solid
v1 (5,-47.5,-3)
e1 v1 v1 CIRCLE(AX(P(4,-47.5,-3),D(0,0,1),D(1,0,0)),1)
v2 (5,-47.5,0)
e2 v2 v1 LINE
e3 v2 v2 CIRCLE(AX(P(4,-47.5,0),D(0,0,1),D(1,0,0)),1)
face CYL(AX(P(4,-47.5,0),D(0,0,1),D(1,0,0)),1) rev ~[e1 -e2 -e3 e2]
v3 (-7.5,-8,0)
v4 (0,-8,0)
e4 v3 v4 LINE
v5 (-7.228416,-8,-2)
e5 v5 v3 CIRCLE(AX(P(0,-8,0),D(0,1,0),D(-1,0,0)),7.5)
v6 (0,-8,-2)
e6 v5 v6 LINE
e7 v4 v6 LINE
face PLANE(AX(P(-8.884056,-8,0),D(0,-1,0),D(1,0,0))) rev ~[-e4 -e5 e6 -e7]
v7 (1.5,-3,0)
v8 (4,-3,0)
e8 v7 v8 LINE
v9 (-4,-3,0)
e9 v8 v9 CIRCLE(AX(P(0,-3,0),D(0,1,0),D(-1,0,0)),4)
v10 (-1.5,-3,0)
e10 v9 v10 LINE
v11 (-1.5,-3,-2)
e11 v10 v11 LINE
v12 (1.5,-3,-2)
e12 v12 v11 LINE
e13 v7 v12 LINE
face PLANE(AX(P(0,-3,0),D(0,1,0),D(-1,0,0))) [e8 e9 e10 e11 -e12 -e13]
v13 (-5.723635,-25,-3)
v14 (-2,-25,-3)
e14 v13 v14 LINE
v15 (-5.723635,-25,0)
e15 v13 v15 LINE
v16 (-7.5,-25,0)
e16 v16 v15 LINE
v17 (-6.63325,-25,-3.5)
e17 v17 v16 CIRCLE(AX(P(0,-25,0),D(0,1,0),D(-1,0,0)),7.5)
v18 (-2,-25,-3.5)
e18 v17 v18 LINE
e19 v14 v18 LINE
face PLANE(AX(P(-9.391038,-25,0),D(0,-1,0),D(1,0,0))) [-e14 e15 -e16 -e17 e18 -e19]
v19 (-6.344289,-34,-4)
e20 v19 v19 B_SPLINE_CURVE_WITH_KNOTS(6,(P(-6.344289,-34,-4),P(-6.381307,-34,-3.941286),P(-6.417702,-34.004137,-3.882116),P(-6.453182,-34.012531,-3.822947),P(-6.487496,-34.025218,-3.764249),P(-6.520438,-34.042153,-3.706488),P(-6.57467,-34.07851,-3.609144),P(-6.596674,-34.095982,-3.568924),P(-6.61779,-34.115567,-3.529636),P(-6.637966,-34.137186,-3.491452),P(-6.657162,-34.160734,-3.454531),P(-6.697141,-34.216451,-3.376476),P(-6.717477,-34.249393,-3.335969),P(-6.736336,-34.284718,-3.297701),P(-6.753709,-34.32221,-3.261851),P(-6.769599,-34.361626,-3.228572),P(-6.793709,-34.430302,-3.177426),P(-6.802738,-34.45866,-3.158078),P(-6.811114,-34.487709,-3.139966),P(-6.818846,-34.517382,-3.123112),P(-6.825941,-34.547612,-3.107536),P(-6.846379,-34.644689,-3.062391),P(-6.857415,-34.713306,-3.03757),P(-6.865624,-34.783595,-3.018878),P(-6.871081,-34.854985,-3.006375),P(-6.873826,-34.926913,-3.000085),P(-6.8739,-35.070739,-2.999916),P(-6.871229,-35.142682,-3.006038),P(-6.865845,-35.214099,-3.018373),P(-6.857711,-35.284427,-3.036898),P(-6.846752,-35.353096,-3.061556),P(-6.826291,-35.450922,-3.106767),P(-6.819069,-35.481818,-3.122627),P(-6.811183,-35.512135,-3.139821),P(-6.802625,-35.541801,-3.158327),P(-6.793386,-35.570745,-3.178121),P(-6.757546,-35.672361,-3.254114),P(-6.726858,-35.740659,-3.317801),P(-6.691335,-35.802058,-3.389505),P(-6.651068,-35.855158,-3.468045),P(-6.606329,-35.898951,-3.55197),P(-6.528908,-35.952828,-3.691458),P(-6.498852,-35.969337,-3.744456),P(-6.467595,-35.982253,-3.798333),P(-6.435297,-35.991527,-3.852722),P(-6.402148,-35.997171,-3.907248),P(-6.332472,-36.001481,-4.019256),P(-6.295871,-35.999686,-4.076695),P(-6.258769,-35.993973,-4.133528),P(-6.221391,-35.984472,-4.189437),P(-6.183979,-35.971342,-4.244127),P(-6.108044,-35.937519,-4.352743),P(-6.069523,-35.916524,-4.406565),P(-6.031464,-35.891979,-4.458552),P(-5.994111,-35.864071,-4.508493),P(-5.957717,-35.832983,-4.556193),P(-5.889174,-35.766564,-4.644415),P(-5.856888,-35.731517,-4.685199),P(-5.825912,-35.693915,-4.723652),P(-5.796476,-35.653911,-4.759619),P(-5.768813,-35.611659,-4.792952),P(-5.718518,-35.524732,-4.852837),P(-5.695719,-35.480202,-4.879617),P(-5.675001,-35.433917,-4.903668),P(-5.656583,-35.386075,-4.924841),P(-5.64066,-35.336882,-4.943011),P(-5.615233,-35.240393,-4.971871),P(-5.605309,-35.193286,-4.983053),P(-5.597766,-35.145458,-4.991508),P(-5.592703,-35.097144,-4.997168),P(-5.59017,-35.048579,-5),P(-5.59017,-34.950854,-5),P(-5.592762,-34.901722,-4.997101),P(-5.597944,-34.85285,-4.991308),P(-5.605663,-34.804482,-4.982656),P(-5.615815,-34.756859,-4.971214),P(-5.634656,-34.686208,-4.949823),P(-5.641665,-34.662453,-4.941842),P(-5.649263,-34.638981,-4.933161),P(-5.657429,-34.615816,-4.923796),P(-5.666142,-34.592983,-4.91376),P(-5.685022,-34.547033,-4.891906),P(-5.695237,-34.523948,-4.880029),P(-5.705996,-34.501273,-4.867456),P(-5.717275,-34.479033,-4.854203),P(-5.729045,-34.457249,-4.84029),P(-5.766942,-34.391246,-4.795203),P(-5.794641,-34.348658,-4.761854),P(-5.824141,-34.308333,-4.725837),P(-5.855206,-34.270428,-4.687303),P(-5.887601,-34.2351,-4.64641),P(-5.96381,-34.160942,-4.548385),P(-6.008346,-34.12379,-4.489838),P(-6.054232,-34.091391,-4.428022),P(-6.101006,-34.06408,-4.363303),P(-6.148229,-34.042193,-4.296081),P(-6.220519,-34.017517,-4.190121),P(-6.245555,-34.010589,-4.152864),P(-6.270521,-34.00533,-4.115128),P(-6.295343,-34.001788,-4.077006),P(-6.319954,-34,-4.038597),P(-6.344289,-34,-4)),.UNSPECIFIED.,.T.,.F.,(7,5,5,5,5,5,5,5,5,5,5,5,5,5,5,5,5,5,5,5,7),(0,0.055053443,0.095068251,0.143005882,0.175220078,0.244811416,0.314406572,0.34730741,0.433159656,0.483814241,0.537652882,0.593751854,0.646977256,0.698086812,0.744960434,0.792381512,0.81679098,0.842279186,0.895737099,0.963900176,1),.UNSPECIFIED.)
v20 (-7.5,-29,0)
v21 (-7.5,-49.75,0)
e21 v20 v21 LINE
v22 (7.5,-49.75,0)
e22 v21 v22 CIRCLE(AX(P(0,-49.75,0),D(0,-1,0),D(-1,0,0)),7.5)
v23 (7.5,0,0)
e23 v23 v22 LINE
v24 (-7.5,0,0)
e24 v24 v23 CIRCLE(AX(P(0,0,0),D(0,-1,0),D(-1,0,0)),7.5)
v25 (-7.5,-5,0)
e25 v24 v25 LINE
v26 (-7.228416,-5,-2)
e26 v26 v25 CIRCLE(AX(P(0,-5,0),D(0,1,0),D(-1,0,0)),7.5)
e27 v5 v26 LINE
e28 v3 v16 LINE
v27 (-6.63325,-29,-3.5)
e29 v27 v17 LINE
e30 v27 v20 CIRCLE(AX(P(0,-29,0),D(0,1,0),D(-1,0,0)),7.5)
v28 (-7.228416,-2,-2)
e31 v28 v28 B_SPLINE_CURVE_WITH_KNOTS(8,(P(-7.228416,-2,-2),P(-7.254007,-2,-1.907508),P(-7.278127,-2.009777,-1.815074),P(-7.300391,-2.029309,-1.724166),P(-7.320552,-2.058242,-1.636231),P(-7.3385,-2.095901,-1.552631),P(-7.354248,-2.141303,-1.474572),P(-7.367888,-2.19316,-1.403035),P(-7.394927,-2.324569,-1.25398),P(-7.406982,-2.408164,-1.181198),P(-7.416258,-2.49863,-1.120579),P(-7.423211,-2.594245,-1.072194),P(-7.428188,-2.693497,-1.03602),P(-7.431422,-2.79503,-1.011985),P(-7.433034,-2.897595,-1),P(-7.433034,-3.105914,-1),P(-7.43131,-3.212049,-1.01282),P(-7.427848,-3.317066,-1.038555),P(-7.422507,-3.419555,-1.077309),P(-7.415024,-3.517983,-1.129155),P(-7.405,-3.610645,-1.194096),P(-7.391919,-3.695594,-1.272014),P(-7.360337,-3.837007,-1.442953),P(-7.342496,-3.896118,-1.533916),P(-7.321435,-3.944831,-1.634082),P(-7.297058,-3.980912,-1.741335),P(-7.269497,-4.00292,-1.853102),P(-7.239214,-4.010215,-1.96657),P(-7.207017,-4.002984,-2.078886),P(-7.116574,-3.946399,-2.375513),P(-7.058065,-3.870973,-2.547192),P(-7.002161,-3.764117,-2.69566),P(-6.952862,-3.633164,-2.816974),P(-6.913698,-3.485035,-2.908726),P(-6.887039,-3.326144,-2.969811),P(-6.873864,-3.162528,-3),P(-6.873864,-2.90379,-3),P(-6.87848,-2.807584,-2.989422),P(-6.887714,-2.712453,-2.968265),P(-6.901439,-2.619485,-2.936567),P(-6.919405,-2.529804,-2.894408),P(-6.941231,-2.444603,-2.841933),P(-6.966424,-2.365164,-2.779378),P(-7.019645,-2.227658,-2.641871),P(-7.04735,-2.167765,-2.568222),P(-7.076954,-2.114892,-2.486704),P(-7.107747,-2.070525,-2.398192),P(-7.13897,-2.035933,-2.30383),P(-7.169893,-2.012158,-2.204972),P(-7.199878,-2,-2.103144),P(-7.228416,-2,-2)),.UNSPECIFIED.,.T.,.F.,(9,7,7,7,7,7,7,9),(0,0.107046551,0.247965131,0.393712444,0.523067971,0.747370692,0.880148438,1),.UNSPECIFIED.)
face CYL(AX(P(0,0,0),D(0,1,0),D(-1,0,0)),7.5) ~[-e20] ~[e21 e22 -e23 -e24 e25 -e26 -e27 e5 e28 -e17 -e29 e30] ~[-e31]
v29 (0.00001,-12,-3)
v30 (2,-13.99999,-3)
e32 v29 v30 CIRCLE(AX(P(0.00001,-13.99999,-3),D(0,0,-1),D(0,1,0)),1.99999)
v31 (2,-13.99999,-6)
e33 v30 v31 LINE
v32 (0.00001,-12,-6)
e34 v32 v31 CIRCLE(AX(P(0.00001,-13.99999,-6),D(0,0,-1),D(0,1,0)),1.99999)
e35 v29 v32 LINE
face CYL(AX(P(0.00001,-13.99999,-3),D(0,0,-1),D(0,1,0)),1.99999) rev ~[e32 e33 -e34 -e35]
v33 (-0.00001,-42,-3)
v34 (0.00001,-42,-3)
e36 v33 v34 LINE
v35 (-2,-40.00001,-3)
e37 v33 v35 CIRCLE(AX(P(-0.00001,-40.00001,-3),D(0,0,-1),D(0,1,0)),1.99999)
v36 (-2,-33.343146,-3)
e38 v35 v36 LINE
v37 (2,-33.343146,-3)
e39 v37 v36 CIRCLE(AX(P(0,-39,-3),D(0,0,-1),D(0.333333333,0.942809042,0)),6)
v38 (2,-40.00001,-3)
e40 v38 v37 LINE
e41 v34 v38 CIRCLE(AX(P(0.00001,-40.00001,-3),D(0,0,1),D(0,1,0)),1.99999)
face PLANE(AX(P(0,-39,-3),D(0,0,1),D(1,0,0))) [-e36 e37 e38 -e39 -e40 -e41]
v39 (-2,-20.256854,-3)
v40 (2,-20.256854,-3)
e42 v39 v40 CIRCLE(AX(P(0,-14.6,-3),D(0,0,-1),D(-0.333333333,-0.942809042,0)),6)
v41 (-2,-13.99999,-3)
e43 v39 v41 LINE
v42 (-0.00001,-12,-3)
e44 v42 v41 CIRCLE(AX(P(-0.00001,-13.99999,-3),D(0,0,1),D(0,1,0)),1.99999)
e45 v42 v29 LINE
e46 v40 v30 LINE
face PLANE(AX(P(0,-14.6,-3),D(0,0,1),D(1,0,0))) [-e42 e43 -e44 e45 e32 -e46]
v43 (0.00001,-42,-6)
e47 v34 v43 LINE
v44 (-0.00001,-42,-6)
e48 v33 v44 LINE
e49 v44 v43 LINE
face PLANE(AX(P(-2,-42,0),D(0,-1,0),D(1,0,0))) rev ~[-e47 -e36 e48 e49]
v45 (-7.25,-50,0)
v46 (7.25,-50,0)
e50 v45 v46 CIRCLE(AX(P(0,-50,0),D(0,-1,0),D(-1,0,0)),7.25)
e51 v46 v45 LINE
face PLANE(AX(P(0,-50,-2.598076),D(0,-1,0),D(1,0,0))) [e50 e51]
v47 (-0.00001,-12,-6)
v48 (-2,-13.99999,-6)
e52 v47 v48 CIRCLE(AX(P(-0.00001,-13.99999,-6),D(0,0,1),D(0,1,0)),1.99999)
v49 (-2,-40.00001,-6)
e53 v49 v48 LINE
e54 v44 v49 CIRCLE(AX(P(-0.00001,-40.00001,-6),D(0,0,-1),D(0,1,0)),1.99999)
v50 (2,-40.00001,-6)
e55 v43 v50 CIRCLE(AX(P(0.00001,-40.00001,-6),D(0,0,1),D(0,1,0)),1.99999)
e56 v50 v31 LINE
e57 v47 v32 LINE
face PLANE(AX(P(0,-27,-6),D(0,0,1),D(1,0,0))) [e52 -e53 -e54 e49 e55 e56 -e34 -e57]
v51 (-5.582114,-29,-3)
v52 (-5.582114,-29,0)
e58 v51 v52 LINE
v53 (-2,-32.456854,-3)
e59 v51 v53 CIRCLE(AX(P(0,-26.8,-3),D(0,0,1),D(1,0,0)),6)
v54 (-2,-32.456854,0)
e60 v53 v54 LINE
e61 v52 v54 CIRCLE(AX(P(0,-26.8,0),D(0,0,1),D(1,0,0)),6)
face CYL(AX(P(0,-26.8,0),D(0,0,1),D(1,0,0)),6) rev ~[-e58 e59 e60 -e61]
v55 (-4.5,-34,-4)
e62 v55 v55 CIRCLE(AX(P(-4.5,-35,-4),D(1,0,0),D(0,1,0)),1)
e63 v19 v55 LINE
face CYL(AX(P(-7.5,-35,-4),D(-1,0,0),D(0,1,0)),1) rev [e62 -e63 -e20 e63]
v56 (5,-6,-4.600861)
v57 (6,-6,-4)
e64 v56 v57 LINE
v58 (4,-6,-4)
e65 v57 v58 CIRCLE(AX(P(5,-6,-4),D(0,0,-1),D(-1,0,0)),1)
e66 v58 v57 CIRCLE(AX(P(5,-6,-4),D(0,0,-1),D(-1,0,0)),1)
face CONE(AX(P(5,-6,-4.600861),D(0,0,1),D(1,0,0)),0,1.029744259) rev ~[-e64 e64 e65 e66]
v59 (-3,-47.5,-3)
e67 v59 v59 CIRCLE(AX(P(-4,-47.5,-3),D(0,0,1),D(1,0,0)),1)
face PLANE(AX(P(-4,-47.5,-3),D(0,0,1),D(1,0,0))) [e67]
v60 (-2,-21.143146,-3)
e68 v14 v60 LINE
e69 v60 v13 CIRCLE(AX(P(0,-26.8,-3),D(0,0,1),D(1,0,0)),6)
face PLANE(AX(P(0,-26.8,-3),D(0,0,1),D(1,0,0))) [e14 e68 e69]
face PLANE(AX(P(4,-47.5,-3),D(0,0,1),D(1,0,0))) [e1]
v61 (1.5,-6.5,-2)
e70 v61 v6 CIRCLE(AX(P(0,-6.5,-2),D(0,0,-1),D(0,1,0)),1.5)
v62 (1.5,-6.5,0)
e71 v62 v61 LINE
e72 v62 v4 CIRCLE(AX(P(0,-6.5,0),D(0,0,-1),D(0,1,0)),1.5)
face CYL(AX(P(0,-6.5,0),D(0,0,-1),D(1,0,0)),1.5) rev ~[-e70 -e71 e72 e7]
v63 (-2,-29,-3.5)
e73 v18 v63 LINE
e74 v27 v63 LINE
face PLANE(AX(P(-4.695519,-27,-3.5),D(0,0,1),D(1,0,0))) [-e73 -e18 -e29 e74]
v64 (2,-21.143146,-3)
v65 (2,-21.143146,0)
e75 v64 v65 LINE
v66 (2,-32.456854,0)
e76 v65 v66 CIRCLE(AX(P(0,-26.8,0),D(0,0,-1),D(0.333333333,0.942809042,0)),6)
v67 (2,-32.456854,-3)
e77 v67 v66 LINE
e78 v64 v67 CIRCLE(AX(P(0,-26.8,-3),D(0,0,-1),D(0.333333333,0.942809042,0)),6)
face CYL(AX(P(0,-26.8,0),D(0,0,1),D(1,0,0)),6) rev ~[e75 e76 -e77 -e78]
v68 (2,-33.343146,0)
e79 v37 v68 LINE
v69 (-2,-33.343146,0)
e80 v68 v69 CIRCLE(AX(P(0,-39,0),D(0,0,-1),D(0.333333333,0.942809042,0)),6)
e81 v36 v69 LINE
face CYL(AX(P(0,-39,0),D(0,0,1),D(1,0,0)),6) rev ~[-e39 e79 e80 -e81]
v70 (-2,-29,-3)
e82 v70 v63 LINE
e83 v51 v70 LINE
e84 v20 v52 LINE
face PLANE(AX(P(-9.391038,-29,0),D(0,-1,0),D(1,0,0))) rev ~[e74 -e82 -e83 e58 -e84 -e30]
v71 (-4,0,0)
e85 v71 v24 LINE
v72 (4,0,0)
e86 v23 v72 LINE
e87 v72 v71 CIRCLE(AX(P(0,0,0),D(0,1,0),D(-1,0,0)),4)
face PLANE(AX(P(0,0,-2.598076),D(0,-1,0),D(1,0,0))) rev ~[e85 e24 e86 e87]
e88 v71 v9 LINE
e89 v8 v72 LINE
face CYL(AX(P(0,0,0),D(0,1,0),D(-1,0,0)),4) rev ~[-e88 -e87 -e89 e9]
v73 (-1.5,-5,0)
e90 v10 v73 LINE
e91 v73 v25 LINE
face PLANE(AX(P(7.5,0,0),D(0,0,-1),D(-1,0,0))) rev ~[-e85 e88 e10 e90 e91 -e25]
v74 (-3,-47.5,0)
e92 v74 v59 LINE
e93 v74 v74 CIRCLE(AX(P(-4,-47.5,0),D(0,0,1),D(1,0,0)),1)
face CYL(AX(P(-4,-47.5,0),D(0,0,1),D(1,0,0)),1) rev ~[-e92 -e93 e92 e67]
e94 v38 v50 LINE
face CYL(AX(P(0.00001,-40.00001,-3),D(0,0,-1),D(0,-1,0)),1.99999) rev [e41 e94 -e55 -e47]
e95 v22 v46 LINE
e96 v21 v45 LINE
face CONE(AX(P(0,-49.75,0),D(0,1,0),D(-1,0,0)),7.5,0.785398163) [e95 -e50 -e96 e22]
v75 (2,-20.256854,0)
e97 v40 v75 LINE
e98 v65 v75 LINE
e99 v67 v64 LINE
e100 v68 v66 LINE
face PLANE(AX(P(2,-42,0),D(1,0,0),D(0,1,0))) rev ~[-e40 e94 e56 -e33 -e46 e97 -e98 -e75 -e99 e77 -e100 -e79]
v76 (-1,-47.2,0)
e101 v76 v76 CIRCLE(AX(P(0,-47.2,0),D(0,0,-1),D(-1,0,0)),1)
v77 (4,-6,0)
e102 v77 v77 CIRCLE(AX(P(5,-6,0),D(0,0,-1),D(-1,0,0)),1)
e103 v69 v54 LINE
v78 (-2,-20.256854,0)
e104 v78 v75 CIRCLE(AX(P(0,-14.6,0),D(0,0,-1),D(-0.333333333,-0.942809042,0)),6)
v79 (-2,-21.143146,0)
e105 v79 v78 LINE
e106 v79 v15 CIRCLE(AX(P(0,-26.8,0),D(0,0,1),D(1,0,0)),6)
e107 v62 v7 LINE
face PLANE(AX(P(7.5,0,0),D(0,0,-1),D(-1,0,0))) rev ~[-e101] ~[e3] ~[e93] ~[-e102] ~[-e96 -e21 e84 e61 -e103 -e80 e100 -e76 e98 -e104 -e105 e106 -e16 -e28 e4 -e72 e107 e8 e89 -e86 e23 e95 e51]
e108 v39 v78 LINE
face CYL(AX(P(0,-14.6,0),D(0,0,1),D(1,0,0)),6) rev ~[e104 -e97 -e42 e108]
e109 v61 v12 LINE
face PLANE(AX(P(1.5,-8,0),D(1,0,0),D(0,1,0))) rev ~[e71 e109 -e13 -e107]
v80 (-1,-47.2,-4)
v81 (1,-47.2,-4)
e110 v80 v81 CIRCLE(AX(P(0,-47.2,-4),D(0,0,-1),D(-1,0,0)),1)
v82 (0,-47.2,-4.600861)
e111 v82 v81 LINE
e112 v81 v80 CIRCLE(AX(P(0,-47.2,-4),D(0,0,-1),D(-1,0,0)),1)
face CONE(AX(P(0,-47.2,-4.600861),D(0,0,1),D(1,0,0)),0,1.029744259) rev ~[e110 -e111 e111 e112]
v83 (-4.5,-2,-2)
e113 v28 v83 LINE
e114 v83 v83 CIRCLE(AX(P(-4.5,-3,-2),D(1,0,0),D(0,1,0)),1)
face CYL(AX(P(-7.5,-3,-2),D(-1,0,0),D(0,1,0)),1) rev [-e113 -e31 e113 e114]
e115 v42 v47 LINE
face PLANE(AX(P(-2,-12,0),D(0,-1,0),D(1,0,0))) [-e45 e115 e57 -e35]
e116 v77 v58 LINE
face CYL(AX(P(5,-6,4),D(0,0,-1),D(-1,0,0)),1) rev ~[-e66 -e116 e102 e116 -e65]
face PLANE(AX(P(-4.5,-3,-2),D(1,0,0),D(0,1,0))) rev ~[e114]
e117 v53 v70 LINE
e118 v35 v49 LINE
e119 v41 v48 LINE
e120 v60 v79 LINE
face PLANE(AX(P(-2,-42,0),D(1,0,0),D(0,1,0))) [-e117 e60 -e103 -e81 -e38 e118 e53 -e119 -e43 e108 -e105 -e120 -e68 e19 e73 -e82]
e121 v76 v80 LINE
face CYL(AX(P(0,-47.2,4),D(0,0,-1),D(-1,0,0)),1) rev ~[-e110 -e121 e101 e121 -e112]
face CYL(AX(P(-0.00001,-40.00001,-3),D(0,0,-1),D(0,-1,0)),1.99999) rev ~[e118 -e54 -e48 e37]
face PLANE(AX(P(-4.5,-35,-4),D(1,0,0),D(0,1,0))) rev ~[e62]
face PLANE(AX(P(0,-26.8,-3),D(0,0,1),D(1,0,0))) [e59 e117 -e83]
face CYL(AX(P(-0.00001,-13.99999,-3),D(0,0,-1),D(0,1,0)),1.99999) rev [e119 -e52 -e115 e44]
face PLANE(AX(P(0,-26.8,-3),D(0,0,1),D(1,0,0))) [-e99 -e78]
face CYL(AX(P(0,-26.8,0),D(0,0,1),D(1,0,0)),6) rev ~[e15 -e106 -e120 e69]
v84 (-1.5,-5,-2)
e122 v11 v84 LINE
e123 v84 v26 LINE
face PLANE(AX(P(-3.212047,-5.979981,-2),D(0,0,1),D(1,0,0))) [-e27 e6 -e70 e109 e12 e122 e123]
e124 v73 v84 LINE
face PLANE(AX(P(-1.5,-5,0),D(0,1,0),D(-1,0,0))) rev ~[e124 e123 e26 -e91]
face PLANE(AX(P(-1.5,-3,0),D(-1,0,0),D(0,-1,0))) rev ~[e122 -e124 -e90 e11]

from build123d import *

# Parameters (mm, degrees)
F1_DEPTH  = 50
F2_R      = 6
F3_DEPTH  = 3
F4_R      = 4
F5_DEPTH  = 3
F6_W      = 4
F6_H      = 30
F7_DEPTH  = 6
F8_R      = 1.99999
F9_W      = 9.3910377485
F9_H      = 4
F10_DEPTH = 3.5
F12_D     = 2
F12_DEPTH = 4
F12_TIP   = 0.600860619
F14_DEPTH = 2
F15_R     = 1.5
F16_SIZE  = 0.25
F18_R     = 1
F19_DEPTH = 3
F20_R     = 1
F21_DEPTH = 3


# Not quite as in the source:
# - a fillet or chamfer is up to 0.001 mm smaller than in the source, because OpenCascade refuses the exact size


with BuildPart() as f1:
    # F0 (on Front) → F1 (new body)
    with BuildSketch(Plane.XZ):
        with BuildLine():
            Line((7.5, 0), (-7.5, 0))
            ThreePointArc((-7.5, 0), (0, -7.5), (7.5, 0))
        make_face()
    extrude(amount=F1_DEPTH)

    # F2 (on face) → F3 (cut)
    with BuildSketch(Plane.XY):
        with Locations((0, -39)):
            Circle(F2_R)
        with Locations((0, -26.8)):
            Circle(F2_R)
        with Locations((0, -14.6)):
            Circle(F2_R)
    extrude(amount=-F3_DEPTH, mode=Mode.SUBTRACT)

    # F4 (on face) → F5 (cut)
    with BuildSketch(Plane(origin=(0, 0, 0), x_dir=(-1, 0, 0), z_dir=(0, 1, 0))):
        Circle(F4_R)
    extrude(amount=-F5_DEPTH, mode=Mode.SUBTRACT)

    # F6 (on face) → F7 (cut)
    with BuildSketch(Plane.XY):
        with Locations((0, -27)):
            Rectangle(F6_W, F6_H)
    extrude(amount=-F7_DEPTH, mode=Mode.SUBTRACT)

    # F8 (radius 2 in the source; OpenCascade refuses exactly that, so slightly less here)
    f8_edges = [f1.edges().sort_by_distance(p)[0] for p in [
        (-2, -12, -4.5),
        (2, -12, -4.5),
        (-2, -42, -4.5),
        (2, -42, -4.5),
    ]]
    fillet(f8_edges, radius=F8_R)

    # F9 (on face) → F10 (cut)
    with BuildSketch(Plane.XY):
        with Locations((-4.6955188743, -27)):
            Rectangle(F9_W, F9_H)
    extrude(amount=-F10_DEPTH, mode=Mode.SUBTRACT)

    # F12
    with Locations(Plane.XY):
        with Locations((5, -6), (0, -47.2)):
            Hole(F12_D / 2, depth=F12_DEPTH)
            with Locations((0, 0, -(F12_DEPTH + F12_TIP / 2))):  # 118° drill point
                Cone(0, F12_D / 2, F12_TIP, mode=Mode.SUBTRACT)

    # F13 (on face) → F14 (cut)
    with BuildSketch(Plane.XY):
        Polygon((1.5, -3), (-1.5, -3), (-1.5, -5), (-8.88405554, -5), (-8.88405554, -8), (-1.5, -8), (1.5, -8), align=None)
    extrude(amount=-F14_DEPTH, mode=Mode.SUBTRACT)

    # F15
    f15_edges = [f1.edges().sort_by_distance(p)[0] for p in [
        (1.5, -8, -1),
    ]]
    fillet(f15_edges, radius=F15_R)

    # F16
    f16_edges = [f1.edges().sort_by_distance(p)[0] for p in [
        (0, -50, -7.5),
    ]]
    chamfer(f16_edges, length=F16_SIZE)

    # F18 (on offset) → F19 (cut)
    with BuildSketch(Plane.YZ.offset(-7.5)):
        with Locations((-3, -2)):
            Circle(F18_R)
        with Locations((-35, -4)):
            Circle(F18_R)
    extrude(amount=F19_DEPTH, mode=Mode.SUBTRACT)

    # F20 (on face) → F21 (cut)
    with BuildSketch(Plane.XY):
        with Locations((-4, -47.5)):
            Circle(F20_R)
        with Locations((4, -47.5)):
            Circle(F20_R)
    extrude(amount=-F21_DEPTH, mode=Mode.SUBTRACT)


solid = f1.part
